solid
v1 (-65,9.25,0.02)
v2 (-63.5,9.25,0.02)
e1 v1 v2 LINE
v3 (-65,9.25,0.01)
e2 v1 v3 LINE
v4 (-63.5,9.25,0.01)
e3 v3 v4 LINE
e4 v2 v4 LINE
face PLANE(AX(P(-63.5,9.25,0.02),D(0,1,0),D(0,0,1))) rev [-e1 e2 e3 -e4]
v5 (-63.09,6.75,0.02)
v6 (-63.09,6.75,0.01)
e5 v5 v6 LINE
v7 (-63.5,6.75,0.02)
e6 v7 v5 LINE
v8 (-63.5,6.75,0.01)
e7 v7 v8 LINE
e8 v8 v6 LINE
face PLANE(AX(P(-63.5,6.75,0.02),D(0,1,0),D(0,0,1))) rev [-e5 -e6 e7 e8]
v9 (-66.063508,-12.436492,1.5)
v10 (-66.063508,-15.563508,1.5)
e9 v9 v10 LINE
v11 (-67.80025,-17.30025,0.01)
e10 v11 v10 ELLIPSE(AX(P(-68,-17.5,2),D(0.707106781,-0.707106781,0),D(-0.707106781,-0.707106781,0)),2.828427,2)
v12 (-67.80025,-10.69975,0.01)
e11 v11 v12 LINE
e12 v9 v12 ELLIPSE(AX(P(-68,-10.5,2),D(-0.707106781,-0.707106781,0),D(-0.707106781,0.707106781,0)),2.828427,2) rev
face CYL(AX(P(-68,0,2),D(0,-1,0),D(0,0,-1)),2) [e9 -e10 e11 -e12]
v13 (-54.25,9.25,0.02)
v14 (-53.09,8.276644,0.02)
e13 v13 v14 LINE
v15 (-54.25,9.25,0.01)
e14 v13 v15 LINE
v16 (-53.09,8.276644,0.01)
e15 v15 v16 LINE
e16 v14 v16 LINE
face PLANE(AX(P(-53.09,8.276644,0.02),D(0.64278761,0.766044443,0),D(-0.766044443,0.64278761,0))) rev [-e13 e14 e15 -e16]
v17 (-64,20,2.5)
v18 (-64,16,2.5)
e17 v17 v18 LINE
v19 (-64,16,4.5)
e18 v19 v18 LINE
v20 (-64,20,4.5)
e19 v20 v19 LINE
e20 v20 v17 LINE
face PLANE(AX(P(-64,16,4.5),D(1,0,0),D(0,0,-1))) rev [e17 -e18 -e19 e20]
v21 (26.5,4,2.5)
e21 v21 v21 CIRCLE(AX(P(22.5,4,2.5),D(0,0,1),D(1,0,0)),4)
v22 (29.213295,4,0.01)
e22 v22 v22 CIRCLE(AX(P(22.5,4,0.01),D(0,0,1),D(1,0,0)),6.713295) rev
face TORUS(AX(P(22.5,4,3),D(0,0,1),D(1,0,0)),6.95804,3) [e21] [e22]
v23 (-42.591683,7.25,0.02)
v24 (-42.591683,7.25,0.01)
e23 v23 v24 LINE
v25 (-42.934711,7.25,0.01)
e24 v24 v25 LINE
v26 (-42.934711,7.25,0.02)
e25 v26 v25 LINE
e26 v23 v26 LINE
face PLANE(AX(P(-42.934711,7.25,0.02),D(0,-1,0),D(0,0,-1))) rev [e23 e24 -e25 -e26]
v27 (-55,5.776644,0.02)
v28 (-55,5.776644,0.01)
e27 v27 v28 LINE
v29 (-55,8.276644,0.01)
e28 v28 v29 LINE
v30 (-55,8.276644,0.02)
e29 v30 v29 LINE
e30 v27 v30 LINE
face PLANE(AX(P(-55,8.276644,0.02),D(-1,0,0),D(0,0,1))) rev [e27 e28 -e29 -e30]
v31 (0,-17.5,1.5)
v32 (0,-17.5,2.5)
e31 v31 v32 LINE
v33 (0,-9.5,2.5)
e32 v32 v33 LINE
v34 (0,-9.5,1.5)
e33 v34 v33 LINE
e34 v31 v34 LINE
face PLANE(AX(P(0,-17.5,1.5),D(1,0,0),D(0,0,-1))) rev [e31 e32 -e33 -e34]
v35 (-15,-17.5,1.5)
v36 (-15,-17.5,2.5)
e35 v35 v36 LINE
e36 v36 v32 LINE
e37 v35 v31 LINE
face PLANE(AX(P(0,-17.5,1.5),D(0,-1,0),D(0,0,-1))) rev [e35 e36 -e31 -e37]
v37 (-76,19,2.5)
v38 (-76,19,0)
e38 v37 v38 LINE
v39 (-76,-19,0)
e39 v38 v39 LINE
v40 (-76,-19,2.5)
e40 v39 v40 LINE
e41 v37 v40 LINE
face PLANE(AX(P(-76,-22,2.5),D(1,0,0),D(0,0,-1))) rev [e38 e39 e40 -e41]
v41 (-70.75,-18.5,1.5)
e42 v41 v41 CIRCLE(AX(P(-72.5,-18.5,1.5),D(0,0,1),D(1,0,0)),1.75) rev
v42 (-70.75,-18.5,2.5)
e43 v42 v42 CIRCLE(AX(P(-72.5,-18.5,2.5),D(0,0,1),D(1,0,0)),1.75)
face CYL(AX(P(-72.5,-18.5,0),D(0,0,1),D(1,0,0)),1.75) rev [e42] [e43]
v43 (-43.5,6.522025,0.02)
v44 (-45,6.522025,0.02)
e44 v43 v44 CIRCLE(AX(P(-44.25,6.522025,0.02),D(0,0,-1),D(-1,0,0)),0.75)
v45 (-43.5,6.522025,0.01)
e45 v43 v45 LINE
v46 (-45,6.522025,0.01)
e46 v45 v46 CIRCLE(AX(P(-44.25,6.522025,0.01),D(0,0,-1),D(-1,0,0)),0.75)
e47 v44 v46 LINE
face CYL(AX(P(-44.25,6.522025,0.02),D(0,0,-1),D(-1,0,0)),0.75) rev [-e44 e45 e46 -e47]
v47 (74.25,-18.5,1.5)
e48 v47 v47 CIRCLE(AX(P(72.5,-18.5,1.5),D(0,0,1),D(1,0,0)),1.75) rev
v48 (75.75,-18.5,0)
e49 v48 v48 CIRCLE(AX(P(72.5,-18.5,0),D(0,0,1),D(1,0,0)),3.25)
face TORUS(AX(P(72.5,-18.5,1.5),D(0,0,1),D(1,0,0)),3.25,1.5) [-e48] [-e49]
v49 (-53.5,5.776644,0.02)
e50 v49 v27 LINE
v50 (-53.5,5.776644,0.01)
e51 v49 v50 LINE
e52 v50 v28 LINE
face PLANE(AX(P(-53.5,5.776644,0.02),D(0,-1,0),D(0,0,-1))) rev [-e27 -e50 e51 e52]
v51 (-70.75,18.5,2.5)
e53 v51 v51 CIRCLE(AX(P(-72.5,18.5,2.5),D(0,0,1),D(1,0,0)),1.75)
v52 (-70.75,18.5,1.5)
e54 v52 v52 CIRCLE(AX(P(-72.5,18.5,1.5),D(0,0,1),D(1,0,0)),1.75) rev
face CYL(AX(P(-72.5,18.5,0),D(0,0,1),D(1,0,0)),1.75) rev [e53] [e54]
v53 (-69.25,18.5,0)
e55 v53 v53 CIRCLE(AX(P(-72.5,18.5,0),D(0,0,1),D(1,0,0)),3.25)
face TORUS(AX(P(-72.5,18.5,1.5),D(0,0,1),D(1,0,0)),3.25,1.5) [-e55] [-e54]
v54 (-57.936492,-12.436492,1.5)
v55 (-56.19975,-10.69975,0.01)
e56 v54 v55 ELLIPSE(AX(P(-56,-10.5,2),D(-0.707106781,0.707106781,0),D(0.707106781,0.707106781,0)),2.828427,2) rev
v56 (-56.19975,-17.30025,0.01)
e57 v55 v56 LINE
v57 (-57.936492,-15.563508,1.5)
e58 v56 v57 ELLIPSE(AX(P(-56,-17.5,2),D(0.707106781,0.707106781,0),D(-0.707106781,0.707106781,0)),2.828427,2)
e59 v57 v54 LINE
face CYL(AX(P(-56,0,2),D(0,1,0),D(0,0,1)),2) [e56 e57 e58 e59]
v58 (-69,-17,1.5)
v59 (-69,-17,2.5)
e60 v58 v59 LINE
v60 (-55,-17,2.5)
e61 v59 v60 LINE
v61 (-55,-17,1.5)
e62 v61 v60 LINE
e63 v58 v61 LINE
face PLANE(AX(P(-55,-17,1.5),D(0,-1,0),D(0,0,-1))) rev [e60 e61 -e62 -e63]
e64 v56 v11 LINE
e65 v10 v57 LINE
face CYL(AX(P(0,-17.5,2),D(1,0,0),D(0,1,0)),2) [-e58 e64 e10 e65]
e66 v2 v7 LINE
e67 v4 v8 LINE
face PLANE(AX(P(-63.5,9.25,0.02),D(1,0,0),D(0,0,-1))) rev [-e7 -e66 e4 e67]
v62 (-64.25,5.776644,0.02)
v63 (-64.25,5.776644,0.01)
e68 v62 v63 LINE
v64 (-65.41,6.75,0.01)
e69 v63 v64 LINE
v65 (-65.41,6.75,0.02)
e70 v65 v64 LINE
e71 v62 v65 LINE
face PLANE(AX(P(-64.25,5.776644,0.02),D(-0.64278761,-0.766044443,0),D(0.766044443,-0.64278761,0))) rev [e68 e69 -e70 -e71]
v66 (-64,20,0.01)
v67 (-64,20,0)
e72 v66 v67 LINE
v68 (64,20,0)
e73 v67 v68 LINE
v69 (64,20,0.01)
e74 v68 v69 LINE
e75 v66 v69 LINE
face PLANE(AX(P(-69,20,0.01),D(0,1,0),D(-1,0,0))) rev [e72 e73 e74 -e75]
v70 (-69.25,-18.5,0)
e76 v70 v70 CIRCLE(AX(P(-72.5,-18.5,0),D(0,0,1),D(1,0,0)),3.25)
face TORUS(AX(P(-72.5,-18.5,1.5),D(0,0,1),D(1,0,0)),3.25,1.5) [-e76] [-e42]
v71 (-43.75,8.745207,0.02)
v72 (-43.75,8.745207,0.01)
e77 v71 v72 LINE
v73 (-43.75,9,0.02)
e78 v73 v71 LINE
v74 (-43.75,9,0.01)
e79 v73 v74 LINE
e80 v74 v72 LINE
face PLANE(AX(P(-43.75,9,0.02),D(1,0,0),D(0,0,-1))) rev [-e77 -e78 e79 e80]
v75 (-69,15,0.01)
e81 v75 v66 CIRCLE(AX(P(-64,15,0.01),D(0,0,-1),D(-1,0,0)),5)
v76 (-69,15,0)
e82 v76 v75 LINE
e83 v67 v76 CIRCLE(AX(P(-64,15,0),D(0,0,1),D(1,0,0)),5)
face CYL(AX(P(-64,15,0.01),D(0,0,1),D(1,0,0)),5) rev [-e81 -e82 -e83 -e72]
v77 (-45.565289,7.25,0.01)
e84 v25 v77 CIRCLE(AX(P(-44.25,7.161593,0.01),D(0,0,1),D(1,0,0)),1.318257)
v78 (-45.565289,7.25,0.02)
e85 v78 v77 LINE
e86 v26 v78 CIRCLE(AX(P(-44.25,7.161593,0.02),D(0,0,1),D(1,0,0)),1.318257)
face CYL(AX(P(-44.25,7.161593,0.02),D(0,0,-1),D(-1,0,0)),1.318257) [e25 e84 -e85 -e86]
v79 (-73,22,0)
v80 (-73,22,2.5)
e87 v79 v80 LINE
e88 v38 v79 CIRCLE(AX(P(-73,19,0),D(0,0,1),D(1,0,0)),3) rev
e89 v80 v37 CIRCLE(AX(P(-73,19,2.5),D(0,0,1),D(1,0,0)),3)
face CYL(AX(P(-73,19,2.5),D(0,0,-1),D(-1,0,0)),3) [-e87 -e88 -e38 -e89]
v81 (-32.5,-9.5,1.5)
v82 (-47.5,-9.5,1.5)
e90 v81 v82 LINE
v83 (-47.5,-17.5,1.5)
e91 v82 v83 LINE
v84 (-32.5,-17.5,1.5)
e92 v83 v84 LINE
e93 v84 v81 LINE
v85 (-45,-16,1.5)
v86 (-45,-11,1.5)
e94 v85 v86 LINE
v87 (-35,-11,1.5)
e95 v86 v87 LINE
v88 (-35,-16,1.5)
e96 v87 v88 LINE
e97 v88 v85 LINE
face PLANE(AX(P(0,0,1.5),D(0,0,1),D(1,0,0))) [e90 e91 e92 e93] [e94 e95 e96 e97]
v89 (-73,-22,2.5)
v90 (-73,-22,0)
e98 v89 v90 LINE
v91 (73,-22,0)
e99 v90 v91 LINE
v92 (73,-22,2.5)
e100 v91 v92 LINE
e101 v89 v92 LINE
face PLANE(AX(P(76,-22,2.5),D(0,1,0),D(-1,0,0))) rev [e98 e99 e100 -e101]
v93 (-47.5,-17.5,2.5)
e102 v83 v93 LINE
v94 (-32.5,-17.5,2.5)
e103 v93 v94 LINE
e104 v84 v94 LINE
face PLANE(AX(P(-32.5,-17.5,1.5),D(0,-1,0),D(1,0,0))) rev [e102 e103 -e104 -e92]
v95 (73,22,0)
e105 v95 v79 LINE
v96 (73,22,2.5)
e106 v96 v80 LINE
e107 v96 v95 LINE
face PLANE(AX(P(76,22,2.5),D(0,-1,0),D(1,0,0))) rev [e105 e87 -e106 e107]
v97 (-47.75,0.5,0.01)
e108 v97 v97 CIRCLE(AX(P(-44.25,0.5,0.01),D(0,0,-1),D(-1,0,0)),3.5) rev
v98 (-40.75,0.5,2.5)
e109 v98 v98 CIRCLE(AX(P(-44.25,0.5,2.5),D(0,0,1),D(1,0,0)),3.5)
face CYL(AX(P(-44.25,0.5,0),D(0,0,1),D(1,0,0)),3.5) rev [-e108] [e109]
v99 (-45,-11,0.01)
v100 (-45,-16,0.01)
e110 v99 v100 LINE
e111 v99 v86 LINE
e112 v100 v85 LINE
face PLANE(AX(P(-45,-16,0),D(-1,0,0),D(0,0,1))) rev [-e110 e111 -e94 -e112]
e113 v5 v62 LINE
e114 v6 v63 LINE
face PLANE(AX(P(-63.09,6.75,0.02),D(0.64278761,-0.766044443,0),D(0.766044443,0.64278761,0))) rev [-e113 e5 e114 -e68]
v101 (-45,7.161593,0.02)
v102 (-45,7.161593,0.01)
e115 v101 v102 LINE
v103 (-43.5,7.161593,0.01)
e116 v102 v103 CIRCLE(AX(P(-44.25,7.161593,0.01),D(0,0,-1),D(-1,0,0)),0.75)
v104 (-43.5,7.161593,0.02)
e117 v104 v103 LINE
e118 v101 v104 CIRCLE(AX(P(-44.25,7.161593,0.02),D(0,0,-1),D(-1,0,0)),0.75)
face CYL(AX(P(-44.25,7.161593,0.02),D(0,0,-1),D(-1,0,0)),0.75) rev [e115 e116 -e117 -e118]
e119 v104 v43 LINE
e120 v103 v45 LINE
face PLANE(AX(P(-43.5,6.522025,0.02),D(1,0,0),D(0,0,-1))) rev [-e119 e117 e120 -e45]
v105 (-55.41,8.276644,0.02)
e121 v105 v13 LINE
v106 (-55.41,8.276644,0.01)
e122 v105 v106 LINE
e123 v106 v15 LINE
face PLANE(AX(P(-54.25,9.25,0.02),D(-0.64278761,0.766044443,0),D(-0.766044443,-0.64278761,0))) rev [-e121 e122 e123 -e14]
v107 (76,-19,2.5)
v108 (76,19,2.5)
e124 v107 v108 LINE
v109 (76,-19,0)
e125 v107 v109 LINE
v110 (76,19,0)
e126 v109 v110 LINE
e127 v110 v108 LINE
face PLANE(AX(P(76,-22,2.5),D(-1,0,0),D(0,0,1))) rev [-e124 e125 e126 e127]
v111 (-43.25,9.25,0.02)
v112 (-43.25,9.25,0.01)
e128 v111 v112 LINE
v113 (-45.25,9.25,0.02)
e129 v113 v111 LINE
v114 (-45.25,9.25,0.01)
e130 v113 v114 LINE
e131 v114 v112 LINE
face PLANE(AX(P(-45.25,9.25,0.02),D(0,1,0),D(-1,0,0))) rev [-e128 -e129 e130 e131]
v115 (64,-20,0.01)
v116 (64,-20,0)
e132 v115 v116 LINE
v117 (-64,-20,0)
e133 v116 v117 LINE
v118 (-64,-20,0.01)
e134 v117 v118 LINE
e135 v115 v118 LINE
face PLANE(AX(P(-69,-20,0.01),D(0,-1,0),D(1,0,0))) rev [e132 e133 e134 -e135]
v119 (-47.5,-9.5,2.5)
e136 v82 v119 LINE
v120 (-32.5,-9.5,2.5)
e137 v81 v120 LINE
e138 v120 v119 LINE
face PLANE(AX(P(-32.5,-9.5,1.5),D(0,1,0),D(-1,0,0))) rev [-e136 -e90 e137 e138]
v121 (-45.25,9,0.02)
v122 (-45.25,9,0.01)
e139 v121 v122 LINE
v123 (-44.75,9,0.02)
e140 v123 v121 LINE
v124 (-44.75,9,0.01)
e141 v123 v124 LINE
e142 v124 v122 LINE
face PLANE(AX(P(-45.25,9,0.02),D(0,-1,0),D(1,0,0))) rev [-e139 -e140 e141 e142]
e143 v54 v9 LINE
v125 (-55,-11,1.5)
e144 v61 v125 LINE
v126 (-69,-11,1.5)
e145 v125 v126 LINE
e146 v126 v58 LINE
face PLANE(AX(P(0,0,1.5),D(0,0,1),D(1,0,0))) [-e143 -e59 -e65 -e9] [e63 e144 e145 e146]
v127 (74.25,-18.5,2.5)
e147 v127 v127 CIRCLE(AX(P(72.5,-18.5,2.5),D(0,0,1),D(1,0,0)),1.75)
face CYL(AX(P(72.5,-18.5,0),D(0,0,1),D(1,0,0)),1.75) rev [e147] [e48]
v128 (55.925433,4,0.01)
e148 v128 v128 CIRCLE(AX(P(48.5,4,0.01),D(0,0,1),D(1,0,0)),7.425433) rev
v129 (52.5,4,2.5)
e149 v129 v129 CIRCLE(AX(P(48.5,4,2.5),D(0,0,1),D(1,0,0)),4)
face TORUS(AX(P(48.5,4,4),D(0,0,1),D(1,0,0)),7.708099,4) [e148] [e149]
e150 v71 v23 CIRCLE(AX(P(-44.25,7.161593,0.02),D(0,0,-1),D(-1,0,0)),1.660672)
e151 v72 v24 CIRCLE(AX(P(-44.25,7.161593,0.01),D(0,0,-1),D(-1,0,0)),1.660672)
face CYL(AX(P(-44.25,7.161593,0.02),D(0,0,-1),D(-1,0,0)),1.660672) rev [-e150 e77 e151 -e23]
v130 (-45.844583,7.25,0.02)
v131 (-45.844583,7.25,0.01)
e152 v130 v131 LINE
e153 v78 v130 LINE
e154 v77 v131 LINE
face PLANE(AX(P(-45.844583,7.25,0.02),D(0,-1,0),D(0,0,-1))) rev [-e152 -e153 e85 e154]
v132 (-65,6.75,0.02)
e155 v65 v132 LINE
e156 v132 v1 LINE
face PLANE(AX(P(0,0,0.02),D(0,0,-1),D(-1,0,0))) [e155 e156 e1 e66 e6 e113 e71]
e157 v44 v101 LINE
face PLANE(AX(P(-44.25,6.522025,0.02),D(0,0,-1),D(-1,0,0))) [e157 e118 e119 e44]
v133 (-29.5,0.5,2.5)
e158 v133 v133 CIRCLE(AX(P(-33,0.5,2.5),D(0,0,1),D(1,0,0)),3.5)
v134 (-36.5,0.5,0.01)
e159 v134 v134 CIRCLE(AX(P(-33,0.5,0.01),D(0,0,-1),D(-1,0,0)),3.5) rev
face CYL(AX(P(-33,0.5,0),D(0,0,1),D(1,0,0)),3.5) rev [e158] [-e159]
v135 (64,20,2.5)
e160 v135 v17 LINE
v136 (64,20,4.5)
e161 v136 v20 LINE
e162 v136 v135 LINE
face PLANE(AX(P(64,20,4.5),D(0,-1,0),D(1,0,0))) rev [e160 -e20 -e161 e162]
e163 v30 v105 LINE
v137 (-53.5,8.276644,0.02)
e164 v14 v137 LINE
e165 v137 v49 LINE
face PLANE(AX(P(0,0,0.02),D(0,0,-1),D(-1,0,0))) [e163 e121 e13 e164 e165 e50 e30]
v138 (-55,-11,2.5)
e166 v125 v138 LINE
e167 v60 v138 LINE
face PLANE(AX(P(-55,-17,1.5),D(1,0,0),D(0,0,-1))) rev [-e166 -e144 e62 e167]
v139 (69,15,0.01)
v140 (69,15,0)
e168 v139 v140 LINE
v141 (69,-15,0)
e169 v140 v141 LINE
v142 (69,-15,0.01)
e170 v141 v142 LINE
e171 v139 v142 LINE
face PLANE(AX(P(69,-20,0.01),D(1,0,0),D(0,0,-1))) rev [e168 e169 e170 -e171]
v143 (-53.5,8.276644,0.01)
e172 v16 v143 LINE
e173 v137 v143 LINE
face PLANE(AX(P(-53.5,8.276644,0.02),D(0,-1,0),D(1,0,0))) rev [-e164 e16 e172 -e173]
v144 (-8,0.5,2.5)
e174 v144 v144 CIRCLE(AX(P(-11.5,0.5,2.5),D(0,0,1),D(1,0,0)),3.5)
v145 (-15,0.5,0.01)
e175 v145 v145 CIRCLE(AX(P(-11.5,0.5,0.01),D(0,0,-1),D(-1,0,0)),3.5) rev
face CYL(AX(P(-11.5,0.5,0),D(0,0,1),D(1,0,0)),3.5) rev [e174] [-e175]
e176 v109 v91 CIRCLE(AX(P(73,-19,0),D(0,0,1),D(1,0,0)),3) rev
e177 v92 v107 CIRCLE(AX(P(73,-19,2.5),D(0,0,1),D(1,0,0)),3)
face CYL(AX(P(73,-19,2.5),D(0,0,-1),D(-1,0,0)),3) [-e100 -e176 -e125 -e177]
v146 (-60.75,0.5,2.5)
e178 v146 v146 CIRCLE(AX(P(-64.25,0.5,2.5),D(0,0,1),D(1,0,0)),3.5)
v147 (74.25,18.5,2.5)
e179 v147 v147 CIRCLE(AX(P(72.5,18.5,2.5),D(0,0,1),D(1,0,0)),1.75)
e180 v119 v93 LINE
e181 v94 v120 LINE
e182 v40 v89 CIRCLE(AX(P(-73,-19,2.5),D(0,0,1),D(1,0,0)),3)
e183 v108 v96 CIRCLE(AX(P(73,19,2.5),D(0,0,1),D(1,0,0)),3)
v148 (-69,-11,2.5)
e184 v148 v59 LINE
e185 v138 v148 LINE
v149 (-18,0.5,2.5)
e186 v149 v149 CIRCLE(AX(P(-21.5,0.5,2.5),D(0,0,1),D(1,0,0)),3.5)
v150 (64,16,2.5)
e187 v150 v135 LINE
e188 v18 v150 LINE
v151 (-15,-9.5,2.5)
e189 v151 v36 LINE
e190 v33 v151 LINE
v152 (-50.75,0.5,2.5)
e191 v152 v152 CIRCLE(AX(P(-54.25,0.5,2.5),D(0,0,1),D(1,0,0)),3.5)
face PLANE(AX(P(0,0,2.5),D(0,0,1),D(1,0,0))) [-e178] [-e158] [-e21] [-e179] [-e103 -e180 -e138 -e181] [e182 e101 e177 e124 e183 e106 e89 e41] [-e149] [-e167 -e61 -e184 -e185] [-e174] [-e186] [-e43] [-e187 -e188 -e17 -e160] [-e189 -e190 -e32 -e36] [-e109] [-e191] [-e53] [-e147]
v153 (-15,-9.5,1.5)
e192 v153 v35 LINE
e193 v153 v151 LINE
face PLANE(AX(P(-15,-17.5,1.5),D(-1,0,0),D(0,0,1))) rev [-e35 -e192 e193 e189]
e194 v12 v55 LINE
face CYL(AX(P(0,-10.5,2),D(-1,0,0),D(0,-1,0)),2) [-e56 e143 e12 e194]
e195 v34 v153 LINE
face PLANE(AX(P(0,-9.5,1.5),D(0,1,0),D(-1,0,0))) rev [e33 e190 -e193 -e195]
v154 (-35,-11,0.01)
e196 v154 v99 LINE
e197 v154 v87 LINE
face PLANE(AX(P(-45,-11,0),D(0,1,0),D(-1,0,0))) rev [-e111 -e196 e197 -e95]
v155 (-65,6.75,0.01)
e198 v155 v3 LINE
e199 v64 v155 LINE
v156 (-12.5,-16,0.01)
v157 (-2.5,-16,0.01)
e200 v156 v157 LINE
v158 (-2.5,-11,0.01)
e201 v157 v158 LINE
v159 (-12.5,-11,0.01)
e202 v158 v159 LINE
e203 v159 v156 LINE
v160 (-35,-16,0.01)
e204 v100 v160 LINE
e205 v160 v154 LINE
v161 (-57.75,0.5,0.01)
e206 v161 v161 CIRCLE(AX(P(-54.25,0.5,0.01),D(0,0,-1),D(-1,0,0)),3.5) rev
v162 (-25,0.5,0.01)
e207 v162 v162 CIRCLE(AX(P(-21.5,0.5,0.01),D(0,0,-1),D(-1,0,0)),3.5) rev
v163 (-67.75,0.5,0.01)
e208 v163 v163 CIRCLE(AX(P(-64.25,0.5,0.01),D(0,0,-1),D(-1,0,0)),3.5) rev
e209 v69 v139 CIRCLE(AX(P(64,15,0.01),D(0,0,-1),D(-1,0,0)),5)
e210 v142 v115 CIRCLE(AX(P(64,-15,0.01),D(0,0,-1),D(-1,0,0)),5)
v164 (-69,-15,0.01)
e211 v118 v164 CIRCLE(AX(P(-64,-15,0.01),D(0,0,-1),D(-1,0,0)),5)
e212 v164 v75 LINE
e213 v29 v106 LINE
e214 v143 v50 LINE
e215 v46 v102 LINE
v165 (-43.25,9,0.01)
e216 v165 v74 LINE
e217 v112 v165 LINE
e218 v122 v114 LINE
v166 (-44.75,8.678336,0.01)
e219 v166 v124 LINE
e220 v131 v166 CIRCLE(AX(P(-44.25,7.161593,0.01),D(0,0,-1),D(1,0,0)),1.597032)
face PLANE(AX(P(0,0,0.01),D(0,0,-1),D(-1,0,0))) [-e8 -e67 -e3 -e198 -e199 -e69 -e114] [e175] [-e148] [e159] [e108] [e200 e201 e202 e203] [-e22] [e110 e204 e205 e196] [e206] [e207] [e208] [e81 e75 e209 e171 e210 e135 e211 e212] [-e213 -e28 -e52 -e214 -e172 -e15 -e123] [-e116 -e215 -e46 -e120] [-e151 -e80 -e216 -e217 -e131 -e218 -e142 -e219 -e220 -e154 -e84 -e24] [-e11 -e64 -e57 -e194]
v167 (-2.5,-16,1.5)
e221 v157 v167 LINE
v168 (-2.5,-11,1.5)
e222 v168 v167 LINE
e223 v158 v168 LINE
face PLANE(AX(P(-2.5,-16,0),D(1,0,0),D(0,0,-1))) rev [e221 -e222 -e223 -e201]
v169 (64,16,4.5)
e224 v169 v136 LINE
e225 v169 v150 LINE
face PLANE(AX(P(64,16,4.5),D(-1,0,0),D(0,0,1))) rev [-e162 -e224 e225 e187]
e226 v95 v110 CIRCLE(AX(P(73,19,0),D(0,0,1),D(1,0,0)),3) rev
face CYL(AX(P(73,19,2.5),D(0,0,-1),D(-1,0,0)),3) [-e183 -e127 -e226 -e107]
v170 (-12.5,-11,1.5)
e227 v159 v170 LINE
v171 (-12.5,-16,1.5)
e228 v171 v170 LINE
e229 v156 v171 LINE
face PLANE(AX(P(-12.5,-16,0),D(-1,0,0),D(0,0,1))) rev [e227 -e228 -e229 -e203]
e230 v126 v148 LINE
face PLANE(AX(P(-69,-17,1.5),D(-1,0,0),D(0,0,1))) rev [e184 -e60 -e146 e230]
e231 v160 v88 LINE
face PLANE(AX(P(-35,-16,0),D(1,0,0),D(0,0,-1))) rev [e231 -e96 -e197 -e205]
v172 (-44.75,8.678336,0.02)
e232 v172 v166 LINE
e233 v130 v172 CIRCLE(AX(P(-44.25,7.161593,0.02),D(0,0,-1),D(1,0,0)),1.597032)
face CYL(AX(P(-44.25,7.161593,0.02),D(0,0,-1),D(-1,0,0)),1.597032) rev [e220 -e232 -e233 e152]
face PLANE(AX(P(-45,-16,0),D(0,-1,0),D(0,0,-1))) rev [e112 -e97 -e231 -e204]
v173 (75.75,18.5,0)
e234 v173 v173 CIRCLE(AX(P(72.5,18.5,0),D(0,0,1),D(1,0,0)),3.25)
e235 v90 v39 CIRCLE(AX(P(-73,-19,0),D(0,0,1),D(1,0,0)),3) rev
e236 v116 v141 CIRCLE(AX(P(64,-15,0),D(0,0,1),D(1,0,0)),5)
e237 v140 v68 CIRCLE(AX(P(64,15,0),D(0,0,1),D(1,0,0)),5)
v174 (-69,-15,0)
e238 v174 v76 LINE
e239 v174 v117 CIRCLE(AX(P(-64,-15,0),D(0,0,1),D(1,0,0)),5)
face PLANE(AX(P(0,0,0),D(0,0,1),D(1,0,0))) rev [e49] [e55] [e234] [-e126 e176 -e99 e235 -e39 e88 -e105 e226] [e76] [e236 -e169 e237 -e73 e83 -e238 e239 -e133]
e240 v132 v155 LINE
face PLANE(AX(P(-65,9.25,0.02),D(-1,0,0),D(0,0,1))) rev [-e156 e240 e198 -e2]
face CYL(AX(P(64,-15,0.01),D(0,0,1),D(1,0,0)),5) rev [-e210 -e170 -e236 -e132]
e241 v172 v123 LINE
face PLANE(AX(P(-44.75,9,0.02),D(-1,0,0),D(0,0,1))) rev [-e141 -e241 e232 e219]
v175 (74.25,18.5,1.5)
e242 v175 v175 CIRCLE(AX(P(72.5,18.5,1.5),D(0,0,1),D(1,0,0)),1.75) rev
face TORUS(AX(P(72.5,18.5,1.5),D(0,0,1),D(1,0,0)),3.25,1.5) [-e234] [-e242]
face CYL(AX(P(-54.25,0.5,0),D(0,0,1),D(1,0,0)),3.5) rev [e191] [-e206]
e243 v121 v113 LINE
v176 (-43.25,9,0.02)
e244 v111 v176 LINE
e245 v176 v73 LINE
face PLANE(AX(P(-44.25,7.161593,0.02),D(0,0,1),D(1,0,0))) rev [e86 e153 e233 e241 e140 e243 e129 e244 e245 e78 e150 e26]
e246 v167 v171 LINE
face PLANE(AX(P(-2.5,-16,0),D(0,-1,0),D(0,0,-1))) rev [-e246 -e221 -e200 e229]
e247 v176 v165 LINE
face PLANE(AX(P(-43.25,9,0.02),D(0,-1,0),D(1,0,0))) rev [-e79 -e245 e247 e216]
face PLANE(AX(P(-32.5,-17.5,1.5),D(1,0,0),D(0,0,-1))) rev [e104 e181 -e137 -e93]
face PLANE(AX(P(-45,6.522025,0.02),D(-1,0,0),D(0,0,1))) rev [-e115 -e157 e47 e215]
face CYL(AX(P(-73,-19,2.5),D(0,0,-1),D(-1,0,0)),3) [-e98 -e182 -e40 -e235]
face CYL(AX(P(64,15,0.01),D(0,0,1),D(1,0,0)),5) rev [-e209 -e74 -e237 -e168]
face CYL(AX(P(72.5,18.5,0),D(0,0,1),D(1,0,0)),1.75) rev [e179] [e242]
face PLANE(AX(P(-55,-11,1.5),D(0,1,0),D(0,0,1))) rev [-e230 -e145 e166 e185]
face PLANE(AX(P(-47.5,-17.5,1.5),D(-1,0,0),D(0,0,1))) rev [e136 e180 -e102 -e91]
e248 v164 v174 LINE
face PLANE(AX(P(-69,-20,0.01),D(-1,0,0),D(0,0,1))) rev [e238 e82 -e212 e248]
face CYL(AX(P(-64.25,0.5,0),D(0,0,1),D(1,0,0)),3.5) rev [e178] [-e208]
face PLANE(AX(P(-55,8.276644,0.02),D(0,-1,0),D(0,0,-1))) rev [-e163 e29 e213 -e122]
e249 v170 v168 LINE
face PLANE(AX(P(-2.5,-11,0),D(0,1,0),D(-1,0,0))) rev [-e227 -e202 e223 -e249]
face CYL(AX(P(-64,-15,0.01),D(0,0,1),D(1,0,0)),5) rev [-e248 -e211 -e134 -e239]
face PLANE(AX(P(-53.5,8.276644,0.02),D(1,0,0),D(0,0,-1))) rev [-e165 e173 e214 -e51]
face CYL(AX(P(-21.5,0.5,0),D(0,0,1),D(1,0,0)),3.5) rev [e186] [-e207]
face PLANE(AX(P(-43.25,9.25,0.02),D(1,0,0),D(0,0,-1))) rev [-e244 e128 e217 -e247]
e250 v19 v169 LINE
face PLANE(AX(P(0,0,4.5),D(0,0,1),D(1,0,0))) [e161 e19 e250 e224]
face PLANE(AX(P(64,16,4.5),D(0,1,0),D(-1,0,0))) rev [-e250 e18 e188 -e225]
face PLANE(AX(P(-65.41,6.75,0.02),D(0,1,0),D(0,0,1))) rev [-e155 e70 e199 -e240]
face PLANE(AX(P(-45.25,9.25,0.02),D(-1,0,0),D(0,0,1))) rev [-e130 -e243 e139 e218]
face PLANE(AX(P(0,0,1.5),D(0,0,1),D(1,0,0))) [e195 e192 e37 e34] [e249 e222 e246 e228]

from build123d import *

# Parameters (mm, degrees)
SKETCH1_W            = 152
SKETCH1_H            = 44
MAIN_BODY_DEPTH      = 2.5
BODY_CORNERS_R       = 3
SKETCH2_R            = 1.75
MOUNTING_HOLES_DEPTH = 80.159648812
BOLT_HEADS_R         = 1.5
SKETCH3_R            = 3.5
SKETCH3_R_2          = 4
SKETCH3_W            = 10
SKETCH3_H            = 5
SKETCH3_W_2          = 8
SKETCH3_H_2          = 3
CONNECTORS_DEPTH     = 80.159648812
RF_CONN_FILLET_R     = 4
RF_CONN_FILLET_R_2   = 3
FAN_SW_FILLET_R      = 2
SKETCH6_W            = 138
SKETCH6_H            = 40
PAINT_SLOT_DEPTH     = 0.01
PAINT_SLOT_CORNERS_R = 5
SKETCH7_W            = 14
SKETCH7_H            = 6
SKETCH7_W_2          = 15
SKETCH7_H_2          = 8
BACK_CUT_DEPTH       = 1
SKETCH8_W            = 128
SKETCH8_H            = 4
BACK_SUPPORT_DEPTH   = 2
CONN_ARTWORK_DEPTH   = 0.01


with BuildPart() as part:
    # Sketch1 → main_body (new body)
    with BuildSketch(Plane.XY):
        Rectangle(SKETCH1_W, SKETCH1_H)
    extrude(amount=MAIN_BODY_DEPTH)

    # body_corners
    body_corners_edges = [part.edges().sort_by_distance(p)[0] for p in [
        (-76, 22, 1.25),
        (76, 22, 1.25),
        (76, -22, 1.25),
        (-76, -22, 1.25),
    ]]
    fillet(body_corners_edges, radius=BODY_CORNERS_R)

    # Sketch2 → mounting_holes (cut, through all)
    with BuildSketch(Plane.XY.offset(2.5)):
        with Locations((-72.5, -18.5)):
            Circle(SKETCH2_R)
        with Locations((72.5, 18.5)):
            Circle(SKETCH2_R)
        with Locations((72.5, -18.5)):
            Circle(SKETCH2_R)
        with Locations((-72.5, 18.5)):
            Circle(SKETCH2_R)
    extrude(amount=-MOUNTING_HOLES_DEPTH, mode=Mode.SUBTRACT)

    # bolt_heads
    bolt_heads_edges = [part.edges().sort_by_distance(p)[0] for p in [
        (-74.25, -18.5, 0),
        (70.75, 18.5, 0),
        (70.75, -18.5, 0),
        (-74.25, 18.5, 0),
    ]]
    fillet(bolt_heads_edges, radius=BOLT_HEADS_R)

    # Sketch3 → connectors (cut, through all)
    with BuildSketch(Plane.XY.offset(2.5)):
        with Locations((-11.5, 0.5)):
            Circle(SKETCH3_R)
        with Locations((-21.5, 0.5)):
            Circle(SKETCH3_R)
        with Locations((-33, 0.5)):
            Circle(SKETCH3_R)
        with Locations((-64.25, 0.5)):
            Circle(SKETCH3_R)
        with Locations((-44.25, 0.5)):
            Circle(SKETCH3_R)
        with Locations((-54.25, 0.5)):
            Circle(SKETCH3_R)
        with Locations((48.5, 4)):
            Circle(SKETCH3_R_2)
        with Locations((22.5, 4)):
            Circle(SKETCH3_R_2)
        with Locations((-40, -13.5)):
            Rectangle(SKETCH3_W, SKETCH3_H)
        with Locations((-62, -14)):
            Rectangle(SKETCH3_W_2, SKETCH3_H_2)
        with Locations((-7.5, -13.5)):
            Rectangle(SKETCH3_W, SKETCH3_H)
    extrude(amount=-CONNECTORS_DEPTH, mode=Mode.SUBTRACT)

    # rf_conn_fillet
    # the kernel refuses this fillet: 4, 3 mm, written as the material it takes off along each edge
    with BuildSketch(Plane(origin=(48.5, 4, 0), x_dir=(1, 0, 0), z_dir=(0, -1, 0))) as rf_conn_fillet_piece_1:
        with BuildLine():
            CenterArc((7.708099244, 4), RF_CONN_FILLET_R, 202.024312837, 67.975687163)
            Line((4, 2.5), (3.925838015, 2.47))
            ThreePointArc((3.925838015, 2.47), (3.92, 1.25), (3.92, 0))
            Line((3.92, 0), (4, -0.08))
            Line((4, -0.08), (7.708099244, -0.08))
            Line((7.708099244, -0.08), (7.708099244, 0))
        make_face()
    revolve(axis=Axis((48.5, 4, 0), (0, 0, 1)), mode=Mode.SUBTRACT)
    with BuildSketch(Plane(origin=(22.5, 4, 0), x_dir=(1, 0, 0), z_dir=(0, -1, 0))) as rf_conn_fillet_piece_2:
        with BuildLine():
            CenterArc((6.958039892, 3), RF_CONN_FILLET_R_2, 189.594068227, 80.405931773)
            Line((4, 2.5), (3.940839202, 2.49))
            ThreePointArc((3.940839202, 2.49), (3.94, 1.25), (3.94, 0))
            Line((3.94, 0), (4, -0.06))
            Line((4, -0.06), (6.958039892, -0.06))
            Line((6.958039892, -0.06), (6.958039892, 0))
        make_face()
    revolve(axis=Axis((22.5, 4, 0), (0, 0, 1)), mode=Mode.SUBTRACT)

    # fan_sw_fillet
    fan_sw_fillet_edges = [part.edges().sort_by_distance(p)[0] for p in [
        (-66, -14, 0),
        (-62, -12.5, 0),
        (-58, -14, 0),
        (-62, -15.5, 0),
    ]]
    fillet(fan_sw_fillet_edges, radius=FAN_SW_FILLET_R)

    # Sketch6 → paint_slot (cut)
    with BuildSketch(Plane(origin=(0, 0, 0), x_dir=(-1, 0, 0), z_dir=(0, 0, -1))):
        Rectangle(SKETCH6_W, SKETCH6_H)
    extrude(amount=-PAINT_SLOT_DEPTH, mode=Mode.SUBTRACT)

    # paint_slot_corners
    paint_slot_corners_edges = [part.edges().sort_by_distance(p)[0] for p in [
        (69, -20, 0.005),
        (69, 20, 0.005),
        (-69, 20, 0.005),
        (-69, -20, 0.005),
    ]]
    fillet(paint_slot_corners_edges, radius=PAINT_SLOT_CORNERS_R)

    # Sketch7 → back_cut (cut)
    with BuildSketch(Plane.XY.offset(2.5)):
        with Locations((-62, -14)):
            Rectangle(SKETCH7_W, SKETCH7_H)
        with Locations((-40, -13.5)):
            Rectangle(SKETCH7_W_2, SKETCH7_H_2)
        with Locations((-7.5, -13.5)):
            Rectangle(SKETCH7_W_2, SKETCH7_H_2)
    extrude(amount=-BACK_CUT_DEPTH, mode=Mode.SUBTRACT)

    # Sketch8 → back_support (add)
    with BuildSketch(Plane.XY.offset(2.5)):
        with Locations((0, 18)):
            Rectangle(SKETCH8_W, SKETCH8_H)
    extrude(amount=BACK_SUPPORT_DEPTH)

    # Sketch9 → conn_artwork (cut)
    with BuildSketch(Plane(origin=(0, 0, 0.01), x_dir=(-1, 0, 0), z_dir=(0, 0, -1))):
        Polygon((63.5, 9.25), (65, 9.25), (65, 6.75), (65.41, 6.75), (64.25, 5.776644428), (63.09, 6.75), (63.5, 6.75), align=None)
        Polygon((53.5, 8.276644428), (53.09, 8.276644428), (54.25, 9.25), (55.41, 8.276644428), (55, 8.276644428), (55, 5.776644428), (53.5, 5.776644428), align=None)
        with BuildLine():
            Line((43.5, 6.52202469), (43.5, 7.161592885))
            ThreePointArc((43.5, 7.161592885), (44.25, 7.911592885), (45, 7.161592885))
            Line((45, 7.161592885), (45, 6.52202469))
            ThreePointArc((45, 6.52202469), (44.25, 5.77202469), (43.5, 6.52202469))
        make_face()
        with BuildLine():
            Line((45.25, 9.25), (43.25, 9.25))
            Line((43.25, 9.25), (43.25, 9))
            Line((43.25, 9), (43.75, 9))
            Line((43.75, 9), (43.75, 8.745206654))
            ThreePointArc((43.75, 8.745206654), (42.937180788, 8.178617116), (42.591682554, 7.25))
            Line((42.591682554, 7.25), (42.934710965, 7.25))
            ThreePointArc((42.934710965, 7.25), (44.25, 8.479849712), (45.565289035, 7.25))
            Line((45.565289035, 7.25), (45.844582901, 7.25))
            ThreePointArc((45.844582901, 7.25), (45.51761804, 8.133011924), (44.75, 8.678336253))
            Line((44.75, 8.678336253), (44.75, 9))
            Line((44.75, 9), (45.25, 9))
            Line((45.25, 9), (45.25, 9.25))
        make_face()
    extrude(amount=-CONN_ARTWORK_DEPTH, mode=Mode.SUBTRACT)


solid = part.part
